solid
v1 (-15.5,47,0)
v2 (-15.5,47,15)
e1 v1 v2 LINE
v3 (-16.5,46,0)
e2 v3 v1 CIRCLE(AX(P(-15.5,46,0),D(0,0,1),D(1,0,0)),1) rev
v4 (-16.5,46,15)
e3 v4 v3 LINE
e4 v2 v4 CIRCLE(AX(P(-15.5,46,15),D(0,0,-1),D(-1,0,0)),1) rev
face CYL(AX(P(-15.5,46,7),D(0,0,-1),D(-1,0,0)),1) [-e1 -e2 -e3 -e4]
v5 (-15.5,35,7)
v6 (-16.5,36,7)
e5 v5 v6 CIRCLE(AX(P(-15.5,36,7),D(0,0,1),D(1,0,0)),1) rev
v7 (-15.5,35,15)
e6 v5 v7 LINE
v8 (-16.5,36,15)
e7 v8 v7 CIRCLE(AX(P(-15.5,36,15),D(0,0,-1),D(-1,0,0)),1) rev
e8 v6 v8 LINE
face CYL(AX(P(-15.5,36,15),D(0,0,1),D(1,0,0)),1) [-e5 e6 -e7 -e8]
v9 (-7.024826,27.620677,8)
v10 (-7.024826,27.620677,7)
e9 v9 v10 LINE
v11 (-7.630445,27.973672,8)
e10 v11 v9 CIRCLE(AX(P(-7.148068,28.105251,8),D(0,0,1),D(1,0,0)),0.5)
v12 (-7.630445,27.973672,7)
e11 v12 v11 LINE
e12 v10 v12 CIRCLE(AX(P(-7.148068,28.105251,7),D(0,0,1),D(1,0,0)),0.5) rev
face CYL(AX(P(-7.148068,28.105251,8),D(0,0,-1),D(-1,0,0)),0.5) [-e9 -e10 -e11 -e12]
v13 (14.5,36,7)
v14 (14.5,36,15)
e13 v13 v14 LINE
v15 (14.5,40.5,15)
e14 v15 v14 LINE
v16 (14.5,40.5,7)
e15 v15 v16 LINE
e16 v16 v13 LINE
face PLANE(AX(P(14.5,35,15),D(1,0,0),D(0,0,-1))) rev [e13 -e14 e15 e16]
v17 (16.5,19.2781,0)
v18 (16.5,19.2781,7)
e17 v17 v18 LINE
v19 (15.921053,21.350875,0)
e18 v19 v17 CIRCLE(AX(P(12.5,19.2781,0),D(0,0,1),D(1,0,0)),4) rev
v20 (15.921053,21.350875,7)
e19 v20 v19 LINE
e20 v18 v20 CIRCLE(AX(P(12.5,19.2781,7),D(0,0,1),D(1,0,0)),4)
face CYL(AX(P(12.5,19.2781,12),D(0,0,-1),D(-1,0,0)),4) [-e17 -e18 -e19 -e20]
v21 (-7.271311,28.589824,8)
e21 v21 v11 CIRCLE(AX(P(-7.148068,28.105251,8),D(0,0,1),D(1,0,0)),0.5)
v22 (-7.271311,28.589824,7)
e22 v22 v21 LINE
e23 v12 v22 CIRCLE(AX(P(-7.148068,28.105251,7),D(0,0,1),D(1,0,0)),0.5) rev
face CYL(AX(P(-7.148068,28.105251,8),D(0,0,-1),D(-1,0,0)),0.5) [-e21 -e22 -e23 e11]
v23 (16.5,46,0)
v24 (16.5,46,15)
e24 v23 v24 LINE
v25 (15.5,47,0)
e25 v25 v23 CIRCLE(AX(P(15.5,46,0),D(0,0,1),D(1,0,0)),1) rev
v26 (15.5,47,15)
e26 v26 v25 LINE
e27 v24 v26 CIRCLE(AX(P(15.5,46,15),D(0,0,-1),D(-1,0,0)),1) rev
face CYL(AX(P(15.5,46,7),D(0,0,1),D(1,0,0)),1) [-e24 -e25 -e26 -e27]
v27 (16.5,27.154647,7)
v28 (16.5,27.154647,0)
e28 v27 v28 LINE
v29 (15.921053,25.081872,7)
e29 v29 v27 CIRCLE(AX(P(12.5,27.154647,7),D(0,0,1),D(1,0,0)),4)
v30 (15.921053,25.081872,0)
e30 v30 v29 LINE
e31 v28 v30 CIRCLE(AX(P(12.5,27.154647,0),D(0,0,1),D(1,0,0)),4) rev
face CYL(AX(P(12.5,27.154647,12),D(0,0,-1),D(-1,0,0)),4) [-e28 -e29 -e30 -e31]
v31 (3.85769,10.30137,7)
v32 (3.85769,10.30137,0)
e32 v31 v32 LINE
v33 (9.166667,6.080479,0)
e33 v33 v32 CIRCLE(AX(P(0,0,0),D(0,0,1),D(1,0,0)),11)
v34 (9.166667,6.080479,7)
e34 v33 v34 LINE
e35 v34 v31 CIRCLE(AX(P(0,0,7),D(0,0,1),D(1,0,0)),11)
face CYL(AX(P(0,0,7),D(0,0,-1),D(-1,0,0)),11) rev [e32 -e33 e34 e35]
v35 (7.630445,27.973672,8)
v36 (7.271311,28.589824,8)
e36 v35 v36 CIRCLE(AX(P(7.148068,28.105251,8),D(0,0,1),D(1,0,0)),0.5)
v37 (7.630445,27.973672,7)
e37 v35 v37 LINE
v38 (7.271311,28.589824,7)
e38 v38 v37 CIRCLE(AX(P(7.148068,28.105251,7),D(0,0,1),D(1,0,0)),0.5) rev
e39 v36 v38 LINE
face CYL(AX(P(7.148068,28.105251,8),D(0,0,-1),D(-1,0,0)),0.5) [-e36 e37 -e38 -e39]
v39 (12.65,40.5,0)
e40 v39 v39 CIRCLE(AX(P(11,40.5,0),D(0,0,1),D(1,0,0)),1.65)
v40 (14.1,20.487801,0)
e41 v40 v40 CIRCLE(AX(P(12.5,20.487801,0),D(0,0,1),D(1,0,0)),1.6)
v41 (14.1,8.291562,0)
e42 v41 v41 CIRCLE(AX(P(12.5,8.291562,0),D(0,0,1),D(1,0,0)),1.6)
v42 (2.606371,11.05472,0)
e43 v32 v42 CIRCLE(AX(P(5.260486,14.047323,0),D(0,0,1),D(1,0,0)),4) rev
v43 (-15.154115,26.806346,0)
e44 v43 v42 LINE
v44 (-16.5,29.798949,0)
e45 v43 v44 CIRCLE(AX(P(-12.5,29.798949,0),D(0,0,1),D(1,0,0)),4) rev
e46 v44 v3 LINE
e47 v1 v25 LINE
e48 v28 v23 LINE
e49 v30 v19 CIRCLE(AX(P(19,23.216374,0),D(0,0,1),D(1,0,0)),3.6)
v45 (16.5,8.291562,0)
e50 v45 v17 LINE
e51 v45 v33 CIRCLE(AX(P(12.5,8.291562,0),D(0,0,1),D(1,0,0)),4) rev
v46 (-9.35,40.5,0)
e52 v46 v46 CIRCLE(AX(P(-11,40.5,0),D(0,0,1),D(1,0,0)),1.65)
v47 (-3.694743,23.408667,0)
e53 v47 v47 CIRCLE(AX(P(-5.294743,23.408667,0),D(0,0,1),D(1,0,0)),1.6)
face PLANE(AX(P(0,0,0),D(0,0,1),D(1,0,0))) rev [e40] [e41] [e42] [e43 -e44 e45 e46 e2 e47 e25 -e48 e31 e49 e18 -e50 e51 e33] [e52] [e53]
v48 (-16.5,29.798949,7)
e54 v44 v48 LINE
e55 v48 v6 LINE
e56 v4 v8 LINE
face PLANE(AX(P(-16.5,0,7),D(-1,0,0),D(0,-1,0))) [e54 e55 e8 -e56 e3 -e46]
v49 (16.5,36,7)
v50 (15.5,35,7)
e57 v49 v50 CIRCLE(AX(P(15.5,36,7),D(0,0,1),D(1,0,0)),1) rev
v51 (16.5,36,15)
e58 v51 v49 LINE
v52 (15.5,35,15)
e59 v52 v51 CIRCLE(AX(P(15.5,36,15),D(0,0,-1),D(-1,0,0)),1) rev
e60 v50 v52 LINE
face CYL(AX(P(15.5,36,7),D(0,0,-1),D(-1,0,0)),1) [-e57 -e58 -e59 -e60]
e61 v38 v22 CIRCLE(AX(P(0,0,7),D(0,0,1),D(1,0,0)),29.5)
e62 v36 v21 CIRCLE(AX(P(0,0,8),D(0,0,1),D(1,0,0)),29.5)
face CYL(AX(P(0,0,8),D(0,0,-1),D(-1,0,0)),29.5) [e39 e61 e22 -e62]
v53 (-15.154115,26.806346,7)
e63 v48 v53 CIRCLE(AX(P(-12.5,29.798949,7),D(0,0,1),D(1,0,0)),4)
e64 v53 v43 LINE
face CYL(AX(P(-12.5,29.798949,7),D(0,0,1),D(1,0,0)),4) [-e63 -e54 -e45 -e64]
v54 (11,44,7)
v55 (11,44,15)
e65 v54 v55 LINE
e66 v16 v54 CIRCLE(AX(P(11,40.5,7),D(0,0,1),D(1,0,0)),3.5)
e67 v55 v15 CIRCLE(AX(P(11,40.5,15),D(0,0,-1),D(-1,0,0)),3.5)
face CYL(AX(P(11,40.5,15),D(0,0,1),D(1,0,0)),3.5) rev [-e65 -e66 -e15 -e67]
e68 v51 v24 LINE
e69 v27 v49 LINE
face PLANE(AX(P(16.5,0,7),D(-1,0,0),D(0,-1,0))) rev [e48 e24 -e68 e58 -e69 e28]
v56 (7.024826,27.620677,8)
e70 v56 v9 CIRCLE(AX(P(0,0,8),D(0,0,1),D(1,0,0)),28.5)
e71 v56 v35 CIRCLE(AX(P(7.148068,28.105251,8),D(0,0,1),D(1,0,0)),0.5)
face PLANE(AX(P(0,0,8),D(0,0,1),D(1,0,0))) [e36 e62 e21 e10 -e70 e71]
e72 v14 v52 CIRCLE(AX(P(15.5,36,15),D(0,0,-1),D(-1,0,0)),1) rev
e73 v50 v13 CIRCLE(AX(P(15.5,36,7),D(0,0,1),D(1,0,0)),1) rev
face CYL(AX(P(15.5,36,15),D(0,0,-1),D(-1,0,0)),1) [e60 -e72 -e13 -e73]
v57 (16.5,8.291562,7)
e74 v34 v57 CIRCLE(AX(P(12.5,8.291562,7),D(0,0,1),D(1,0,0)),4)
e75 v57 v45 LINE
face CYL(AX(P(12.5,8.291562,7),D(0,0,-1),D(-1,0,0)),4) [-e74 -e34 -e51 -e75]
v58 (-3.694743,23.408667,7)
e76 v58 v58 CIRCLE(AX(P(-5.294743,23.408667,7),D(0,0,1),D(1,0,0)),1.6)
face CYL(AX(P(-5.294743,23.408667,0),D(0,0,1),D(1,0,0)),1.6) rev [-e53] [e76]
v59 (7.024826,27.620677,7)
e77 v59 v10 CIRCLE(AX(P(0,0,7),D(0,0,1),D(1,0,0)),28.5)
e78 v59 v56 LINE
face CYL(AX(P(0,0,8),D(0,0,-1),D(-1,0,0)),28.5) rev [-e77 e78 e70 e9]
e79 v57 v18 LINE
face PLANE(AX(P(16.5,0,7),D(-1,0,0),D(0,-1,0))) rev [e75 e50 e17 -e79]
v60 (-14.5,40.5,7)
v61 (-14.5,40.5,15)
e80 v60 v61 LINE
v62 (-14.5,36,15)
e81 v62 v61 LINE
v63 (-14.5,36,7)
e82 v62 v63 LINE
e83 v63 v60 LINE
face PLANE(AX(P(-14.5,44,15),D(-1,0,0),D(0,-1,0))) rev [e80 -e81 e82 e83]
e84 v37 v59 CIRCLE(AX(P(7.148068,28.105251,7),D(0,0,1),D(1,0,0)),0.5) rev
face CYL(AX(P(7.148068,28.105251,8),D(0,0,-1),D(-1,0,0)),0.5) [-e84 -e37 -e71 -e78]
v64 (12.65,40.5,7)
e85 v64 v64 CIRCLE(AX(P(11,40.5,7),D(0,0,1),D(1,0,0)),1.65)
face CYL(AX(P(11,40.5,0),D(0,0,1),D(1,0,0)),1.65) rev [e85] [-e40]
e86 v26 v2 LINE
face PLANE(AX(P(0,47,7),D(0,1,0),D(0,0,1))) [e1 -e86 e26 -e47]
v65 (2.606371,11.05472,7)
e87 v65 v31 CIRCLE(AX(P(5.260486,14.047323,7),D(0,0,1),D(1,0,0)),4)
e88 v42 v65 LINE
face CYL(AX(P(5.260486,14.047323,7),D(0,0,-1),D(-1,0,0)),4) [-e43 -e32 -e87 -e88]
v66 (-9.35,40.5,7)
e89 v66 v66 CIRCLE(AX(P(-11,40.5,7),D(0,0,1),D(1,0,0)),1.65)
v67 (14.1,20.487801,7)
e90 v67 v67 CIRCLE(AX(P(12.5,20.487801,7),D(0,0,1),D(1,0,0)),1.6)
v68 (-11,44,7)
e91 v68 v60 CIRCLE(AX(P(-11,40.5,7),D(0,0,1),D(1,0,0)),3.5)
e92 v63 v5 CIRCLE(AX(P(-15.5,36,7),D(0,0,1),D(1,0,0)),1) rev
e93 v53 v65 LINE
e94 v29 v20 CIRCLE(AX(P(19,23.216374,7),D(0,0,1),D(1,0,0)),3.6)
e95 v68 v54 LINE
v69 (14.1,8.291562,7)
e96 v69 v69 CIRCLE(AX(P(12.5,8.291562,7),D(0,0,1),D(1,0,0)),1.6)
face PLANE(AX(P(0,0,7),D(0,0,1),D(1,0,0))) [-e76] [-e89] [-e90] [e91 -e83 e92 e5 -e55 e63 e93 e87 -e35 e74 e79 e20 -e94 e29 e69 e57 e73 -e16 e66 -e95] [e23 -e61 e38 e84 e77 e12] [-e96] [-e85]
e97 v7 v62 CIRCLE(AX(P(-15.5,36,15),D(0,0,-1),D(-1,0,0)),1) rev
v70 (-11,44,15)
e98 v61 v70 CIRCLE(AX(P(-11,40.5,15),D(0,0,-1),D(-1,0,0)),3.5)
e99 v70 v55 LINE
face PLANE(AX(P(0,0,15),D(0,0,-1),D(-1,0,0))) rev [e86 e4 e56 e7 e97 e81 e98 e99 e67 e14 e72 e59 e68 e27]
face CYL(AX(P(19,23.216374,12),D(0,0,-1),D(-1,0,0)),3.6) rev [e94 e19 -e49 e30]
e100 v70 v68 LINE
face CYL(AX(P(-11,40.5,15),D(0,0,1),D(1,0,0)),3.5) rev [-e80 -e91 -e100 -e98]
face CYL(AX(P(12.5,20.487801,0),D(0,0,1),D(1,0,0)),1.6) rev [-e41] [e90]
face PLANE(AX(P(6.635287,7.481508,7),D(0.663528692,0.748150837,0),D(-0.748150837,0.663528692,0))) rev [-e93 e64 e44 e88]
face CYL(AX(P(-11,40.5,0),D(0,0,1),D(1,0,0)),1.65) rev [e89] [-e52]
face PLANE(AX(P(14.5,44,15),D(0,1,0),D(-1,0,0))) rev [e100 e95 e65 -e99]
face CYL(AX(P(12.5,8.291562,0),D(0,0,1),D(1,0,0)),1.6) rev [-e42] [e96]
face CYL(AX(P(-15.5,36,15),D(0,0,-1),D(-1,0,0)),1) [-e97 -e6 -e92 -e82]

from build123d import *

# Parameters (mm, degrees)
BOSS_EXTRUDE1_DEPTH = 7
BOSS_EXTRUDE2_DEPTH = 8
FILLET1_R           = 3.5
BOSS_EXTRUDE3_DEPTH = 1
FILLET5_R           = 0.5
SKETCH3_R           = 3.6
SKETCH3_R_2         = 3.55
CUT_EXTRUDE2_DEPTH  = 12
FILLET7_R           = 4
FILLET8_R           = 1
SKETCH5_R           = 1.65
SKETCH5_R_2         = 1.6
CUT_EXTRUDE3_DEPTH  = 51.450470761
FILLET12_R          = 4


# Some blends are built 0.0001 mm under size
with BuildPart() as part:
    # Sketch1 → Boss-Extrude1 (new body)
    with BuildSketch(Plane.XY):
        with BuildLine():
            Line((16.5, 47), (-16.5, 47))
            Line((-16.5, 47), (-16.5, 28))
            Line((-16.5, 28), (3.206829084, 10.522178825))
            ThreePointArc((3.206829084, 10.522178825), (7.298815617, 8.229659203), (10.063744764, 4.440837907))
            Line((10.063744764, 4.440837907), (16.5, -1.267422796))
            Line((16.5, -1.267422796), (16.5, 47))
        make_face()
    extrude(amount=BOSS_EXTRUDE1_DEPTH)

    # Sketch2 → Boss-Extrude2 (add)
    with BuildSketch(Plane.XY.offset(7)):
        Polygon((-16.5, 35), (-16.5, 47), (16.5, 47), (16.5, 35), (14.5, 35), (14.5, 44), (-14.5, 44), (-14.5, 35), align=None)
    extrude(amount=BOSS_EXTRUDE2_DEPTH)

    # Fillet1
    fillet1_edges = [part.edges().sort_by_distance(p)[0] for p in [
        (-14.5, 44, 11),
        (14.5, 44, 11),
    ]]
    fillet(fillet1_edges, radius=FILLET1_R)

    # Sketch4 → Boss-Extrude3 (add)
    with BuildSketch(Plane.XY.offset(7)):
        with BuildLine():
            ThreePointArc((7.763157895, 28.460206948), (0, 29.5), (-7.763157895, 28.460206948))
            Line((-7.763157895, 28.460206948), (-7.5, 27.49545417))
            ThreePointArc((-7.5, 27.49545417), (0, 28.5), (7.5, 27.49545417))
            Line((7.5, 27.49545417), (7.763157895, 28.460206948))
        make_face()
    extrude(amount=BOSS_EXTRUDE3_DEPTH)

    # Fillet5
    fillet5_edges = [part.edges().sort_by_distance(p)[0] for p in [
        (7.763157895, 28.460206948, 7.5),
        (7.5, 27.49545417, 7.5),
        (-7.763157895, 28.460206948, 7.5),
        (-7.5, 27.49545417, 7.5),
    ]]
    fillet(fillet5_edges, radius=FILLET5_R - 0.0001)  # a hair under: the kernel refuses the full size

    # Sketch3 → Cut-Extrude2 (cut)
    with BuildSketch(Plane(origin=(0, 0, 0), x_dir=(-1, 0, 0), z_dir=(0, 0, -1))):
        with Locations((-19, 23.216373532)):
            Circle(SKETCH3_R)
        with Locations((19, 23.216373532)):
            Circle(SKETCH3_R_2)
    extrude(amount=-CUT_EXTRUDE2_DEPTH, mode=Mode.SUBTRACT)

    # Fillet7
    # the kernel refuses this fillet: 4 mm, written as the material it takes off along each edge
    with BuildSketch(Plane(origin=(3.206829084, 10.522178825, -2.00647278), x_dir=(0.9469871930704206, -0.3212713123834835, 0), z_dir=(0, 0, 1))) as fillet7_piece_1:
        with BuildLine():
            CenterArc((0.812259209, 3.998047556), FILLET7_R, 247.170276445, 21.039469781)
            Line((-0.739715882, 0.311399578), (0, 0))
            ThreePointArc((0, 0), (0.343648127, 0.005369221), (0.687296254, 0))
        make_face()
    extrude(amount=11.012945561, mode=Mode.SUBTRACT)
    with BuildSketch(Plane(origin=(-16.5, 28, -4.497372603), x_dir=(0.7481508366108257, -0.6635286924304943, 0), z_dir=(0, 0, 1))) as fillet7_piece_2:
        with BuildLine():
            CenterArc((FILLET7_R * 0.449737260328, FILLET7_R), FILLET7_R, 221.569549454, 48.430450546)
            Line((-FILLET7_R * 0.298413576283, FILLET7_R * 0.33647130757), (0, 0))
            Line((0, 0), (FILLET7_R * 0.449737260328, 0))
        make_face()
    extrude(amount=15.994745207, mode=Mode.SUBTRACT)
    with BuildSketch(Plane(origin=(16.5, -1.267422796, -22.201864002), x_dir=(0, 1, 0), z_dir=(0, 0, 1))) as fillet7_piece_3:
        with BuildLine():
            CenterArc((8.880745601, 4), FILLET7_R, 142.478159004, 127.521840996)
            Line((5.708260703, 6.436255236), (0, 0))
            Line((0, 0), (8.880745601, 0))
        make_face()
    extrude(amount=51.403728005, mode=Mode.SUBTRACT)
    with BuildSketch(Plane(origin=(16.5, 25.806740302, 10.36976741), x_dir=(0, 1, 0), z_dir=(0, 0, -1))) as fillet7_piece_4:
        with BuildLine():
            CenterArc((1.347906964, -4), FILLET7_R, 90, 31.211180498)
            ThreePointArc((-0.724868685, -0.578947368), (-0.343707491, -0.312920562), (0, 0))
            Line((0, 0), (1.347906964, 0))
        make_face()
    extrude(amount=13.739534821, mode=Mode.SUBTRACT)
    with BuildSketch(Plane(origin=(16.5, 20.626006763, 10.36976741), x_dir=(-0.6240720217299989, 0.7813668227496173, 0), z_dir=(0, 0, -1))) as fillet7_piece_5:
        with BuildLine():
            CenterArc((1.443078305, -3.966658315), FILLET7_R, 97.402928186, 31.211180498)
            Line((-1.053209782, -0.841191024), (0, 0))
            ThreePointArc((0, 0), (0.463846598, -0.030007516), (0.927693196, 0))
        make_face()
    extrude(amount=13.739534821, mode=Mode.SUBTRACT)

    # Fillet8
    fillet8_edges = [part.edges().sort_by_distance(p)[0] for p in [
        (-16.5, 47, 7.5),
        (16.5, 47, 7.5),
        (-16.5, 35, 11),
        (-14.5, 35, 11),
        (14.5, 35, 11),
        (16.5, 35, 11),
    ]]
    fillet(fillet8_edges, radius=FILLET8_R - 0.0001)  # a hair under: the kernel refuses the full size

    # Sketch5 → Cut-Extrude3 (cut, through all)
    with BuildSketch(Plane.XY.offset(7)):
        with Locations((-11, 40.5)):
            Circle(SKETCH5_R)
        with Locations((11, 40.5)):
            Circle(SKETCH5_R)
        with Locations((12.5, 8.291561976)):
            Circle(SKETCH5_R_2)
        with Locations((12.5, 20.487801249)):
            Circle(SKETCH5_R_2)
        with Locations((-5.294742993, 23.408667127)):
            Circle(SKETCH5_R_2)
    extrude(amount=-CUT_EXTRUDE3_DEPTH, mode=Mode.SUBTRACT)

    # Fillet12
    fillet12_edges = [part.edges().sort_by_distance(p)[0] for p in [
        (10.063744764, 4.440837907, 3.5),
    ]]
    fillet(fillet12_edges, radius=FILLET12_R - 0.0001)  # a hair under: the kernel refuses the full size


solid = part.part
